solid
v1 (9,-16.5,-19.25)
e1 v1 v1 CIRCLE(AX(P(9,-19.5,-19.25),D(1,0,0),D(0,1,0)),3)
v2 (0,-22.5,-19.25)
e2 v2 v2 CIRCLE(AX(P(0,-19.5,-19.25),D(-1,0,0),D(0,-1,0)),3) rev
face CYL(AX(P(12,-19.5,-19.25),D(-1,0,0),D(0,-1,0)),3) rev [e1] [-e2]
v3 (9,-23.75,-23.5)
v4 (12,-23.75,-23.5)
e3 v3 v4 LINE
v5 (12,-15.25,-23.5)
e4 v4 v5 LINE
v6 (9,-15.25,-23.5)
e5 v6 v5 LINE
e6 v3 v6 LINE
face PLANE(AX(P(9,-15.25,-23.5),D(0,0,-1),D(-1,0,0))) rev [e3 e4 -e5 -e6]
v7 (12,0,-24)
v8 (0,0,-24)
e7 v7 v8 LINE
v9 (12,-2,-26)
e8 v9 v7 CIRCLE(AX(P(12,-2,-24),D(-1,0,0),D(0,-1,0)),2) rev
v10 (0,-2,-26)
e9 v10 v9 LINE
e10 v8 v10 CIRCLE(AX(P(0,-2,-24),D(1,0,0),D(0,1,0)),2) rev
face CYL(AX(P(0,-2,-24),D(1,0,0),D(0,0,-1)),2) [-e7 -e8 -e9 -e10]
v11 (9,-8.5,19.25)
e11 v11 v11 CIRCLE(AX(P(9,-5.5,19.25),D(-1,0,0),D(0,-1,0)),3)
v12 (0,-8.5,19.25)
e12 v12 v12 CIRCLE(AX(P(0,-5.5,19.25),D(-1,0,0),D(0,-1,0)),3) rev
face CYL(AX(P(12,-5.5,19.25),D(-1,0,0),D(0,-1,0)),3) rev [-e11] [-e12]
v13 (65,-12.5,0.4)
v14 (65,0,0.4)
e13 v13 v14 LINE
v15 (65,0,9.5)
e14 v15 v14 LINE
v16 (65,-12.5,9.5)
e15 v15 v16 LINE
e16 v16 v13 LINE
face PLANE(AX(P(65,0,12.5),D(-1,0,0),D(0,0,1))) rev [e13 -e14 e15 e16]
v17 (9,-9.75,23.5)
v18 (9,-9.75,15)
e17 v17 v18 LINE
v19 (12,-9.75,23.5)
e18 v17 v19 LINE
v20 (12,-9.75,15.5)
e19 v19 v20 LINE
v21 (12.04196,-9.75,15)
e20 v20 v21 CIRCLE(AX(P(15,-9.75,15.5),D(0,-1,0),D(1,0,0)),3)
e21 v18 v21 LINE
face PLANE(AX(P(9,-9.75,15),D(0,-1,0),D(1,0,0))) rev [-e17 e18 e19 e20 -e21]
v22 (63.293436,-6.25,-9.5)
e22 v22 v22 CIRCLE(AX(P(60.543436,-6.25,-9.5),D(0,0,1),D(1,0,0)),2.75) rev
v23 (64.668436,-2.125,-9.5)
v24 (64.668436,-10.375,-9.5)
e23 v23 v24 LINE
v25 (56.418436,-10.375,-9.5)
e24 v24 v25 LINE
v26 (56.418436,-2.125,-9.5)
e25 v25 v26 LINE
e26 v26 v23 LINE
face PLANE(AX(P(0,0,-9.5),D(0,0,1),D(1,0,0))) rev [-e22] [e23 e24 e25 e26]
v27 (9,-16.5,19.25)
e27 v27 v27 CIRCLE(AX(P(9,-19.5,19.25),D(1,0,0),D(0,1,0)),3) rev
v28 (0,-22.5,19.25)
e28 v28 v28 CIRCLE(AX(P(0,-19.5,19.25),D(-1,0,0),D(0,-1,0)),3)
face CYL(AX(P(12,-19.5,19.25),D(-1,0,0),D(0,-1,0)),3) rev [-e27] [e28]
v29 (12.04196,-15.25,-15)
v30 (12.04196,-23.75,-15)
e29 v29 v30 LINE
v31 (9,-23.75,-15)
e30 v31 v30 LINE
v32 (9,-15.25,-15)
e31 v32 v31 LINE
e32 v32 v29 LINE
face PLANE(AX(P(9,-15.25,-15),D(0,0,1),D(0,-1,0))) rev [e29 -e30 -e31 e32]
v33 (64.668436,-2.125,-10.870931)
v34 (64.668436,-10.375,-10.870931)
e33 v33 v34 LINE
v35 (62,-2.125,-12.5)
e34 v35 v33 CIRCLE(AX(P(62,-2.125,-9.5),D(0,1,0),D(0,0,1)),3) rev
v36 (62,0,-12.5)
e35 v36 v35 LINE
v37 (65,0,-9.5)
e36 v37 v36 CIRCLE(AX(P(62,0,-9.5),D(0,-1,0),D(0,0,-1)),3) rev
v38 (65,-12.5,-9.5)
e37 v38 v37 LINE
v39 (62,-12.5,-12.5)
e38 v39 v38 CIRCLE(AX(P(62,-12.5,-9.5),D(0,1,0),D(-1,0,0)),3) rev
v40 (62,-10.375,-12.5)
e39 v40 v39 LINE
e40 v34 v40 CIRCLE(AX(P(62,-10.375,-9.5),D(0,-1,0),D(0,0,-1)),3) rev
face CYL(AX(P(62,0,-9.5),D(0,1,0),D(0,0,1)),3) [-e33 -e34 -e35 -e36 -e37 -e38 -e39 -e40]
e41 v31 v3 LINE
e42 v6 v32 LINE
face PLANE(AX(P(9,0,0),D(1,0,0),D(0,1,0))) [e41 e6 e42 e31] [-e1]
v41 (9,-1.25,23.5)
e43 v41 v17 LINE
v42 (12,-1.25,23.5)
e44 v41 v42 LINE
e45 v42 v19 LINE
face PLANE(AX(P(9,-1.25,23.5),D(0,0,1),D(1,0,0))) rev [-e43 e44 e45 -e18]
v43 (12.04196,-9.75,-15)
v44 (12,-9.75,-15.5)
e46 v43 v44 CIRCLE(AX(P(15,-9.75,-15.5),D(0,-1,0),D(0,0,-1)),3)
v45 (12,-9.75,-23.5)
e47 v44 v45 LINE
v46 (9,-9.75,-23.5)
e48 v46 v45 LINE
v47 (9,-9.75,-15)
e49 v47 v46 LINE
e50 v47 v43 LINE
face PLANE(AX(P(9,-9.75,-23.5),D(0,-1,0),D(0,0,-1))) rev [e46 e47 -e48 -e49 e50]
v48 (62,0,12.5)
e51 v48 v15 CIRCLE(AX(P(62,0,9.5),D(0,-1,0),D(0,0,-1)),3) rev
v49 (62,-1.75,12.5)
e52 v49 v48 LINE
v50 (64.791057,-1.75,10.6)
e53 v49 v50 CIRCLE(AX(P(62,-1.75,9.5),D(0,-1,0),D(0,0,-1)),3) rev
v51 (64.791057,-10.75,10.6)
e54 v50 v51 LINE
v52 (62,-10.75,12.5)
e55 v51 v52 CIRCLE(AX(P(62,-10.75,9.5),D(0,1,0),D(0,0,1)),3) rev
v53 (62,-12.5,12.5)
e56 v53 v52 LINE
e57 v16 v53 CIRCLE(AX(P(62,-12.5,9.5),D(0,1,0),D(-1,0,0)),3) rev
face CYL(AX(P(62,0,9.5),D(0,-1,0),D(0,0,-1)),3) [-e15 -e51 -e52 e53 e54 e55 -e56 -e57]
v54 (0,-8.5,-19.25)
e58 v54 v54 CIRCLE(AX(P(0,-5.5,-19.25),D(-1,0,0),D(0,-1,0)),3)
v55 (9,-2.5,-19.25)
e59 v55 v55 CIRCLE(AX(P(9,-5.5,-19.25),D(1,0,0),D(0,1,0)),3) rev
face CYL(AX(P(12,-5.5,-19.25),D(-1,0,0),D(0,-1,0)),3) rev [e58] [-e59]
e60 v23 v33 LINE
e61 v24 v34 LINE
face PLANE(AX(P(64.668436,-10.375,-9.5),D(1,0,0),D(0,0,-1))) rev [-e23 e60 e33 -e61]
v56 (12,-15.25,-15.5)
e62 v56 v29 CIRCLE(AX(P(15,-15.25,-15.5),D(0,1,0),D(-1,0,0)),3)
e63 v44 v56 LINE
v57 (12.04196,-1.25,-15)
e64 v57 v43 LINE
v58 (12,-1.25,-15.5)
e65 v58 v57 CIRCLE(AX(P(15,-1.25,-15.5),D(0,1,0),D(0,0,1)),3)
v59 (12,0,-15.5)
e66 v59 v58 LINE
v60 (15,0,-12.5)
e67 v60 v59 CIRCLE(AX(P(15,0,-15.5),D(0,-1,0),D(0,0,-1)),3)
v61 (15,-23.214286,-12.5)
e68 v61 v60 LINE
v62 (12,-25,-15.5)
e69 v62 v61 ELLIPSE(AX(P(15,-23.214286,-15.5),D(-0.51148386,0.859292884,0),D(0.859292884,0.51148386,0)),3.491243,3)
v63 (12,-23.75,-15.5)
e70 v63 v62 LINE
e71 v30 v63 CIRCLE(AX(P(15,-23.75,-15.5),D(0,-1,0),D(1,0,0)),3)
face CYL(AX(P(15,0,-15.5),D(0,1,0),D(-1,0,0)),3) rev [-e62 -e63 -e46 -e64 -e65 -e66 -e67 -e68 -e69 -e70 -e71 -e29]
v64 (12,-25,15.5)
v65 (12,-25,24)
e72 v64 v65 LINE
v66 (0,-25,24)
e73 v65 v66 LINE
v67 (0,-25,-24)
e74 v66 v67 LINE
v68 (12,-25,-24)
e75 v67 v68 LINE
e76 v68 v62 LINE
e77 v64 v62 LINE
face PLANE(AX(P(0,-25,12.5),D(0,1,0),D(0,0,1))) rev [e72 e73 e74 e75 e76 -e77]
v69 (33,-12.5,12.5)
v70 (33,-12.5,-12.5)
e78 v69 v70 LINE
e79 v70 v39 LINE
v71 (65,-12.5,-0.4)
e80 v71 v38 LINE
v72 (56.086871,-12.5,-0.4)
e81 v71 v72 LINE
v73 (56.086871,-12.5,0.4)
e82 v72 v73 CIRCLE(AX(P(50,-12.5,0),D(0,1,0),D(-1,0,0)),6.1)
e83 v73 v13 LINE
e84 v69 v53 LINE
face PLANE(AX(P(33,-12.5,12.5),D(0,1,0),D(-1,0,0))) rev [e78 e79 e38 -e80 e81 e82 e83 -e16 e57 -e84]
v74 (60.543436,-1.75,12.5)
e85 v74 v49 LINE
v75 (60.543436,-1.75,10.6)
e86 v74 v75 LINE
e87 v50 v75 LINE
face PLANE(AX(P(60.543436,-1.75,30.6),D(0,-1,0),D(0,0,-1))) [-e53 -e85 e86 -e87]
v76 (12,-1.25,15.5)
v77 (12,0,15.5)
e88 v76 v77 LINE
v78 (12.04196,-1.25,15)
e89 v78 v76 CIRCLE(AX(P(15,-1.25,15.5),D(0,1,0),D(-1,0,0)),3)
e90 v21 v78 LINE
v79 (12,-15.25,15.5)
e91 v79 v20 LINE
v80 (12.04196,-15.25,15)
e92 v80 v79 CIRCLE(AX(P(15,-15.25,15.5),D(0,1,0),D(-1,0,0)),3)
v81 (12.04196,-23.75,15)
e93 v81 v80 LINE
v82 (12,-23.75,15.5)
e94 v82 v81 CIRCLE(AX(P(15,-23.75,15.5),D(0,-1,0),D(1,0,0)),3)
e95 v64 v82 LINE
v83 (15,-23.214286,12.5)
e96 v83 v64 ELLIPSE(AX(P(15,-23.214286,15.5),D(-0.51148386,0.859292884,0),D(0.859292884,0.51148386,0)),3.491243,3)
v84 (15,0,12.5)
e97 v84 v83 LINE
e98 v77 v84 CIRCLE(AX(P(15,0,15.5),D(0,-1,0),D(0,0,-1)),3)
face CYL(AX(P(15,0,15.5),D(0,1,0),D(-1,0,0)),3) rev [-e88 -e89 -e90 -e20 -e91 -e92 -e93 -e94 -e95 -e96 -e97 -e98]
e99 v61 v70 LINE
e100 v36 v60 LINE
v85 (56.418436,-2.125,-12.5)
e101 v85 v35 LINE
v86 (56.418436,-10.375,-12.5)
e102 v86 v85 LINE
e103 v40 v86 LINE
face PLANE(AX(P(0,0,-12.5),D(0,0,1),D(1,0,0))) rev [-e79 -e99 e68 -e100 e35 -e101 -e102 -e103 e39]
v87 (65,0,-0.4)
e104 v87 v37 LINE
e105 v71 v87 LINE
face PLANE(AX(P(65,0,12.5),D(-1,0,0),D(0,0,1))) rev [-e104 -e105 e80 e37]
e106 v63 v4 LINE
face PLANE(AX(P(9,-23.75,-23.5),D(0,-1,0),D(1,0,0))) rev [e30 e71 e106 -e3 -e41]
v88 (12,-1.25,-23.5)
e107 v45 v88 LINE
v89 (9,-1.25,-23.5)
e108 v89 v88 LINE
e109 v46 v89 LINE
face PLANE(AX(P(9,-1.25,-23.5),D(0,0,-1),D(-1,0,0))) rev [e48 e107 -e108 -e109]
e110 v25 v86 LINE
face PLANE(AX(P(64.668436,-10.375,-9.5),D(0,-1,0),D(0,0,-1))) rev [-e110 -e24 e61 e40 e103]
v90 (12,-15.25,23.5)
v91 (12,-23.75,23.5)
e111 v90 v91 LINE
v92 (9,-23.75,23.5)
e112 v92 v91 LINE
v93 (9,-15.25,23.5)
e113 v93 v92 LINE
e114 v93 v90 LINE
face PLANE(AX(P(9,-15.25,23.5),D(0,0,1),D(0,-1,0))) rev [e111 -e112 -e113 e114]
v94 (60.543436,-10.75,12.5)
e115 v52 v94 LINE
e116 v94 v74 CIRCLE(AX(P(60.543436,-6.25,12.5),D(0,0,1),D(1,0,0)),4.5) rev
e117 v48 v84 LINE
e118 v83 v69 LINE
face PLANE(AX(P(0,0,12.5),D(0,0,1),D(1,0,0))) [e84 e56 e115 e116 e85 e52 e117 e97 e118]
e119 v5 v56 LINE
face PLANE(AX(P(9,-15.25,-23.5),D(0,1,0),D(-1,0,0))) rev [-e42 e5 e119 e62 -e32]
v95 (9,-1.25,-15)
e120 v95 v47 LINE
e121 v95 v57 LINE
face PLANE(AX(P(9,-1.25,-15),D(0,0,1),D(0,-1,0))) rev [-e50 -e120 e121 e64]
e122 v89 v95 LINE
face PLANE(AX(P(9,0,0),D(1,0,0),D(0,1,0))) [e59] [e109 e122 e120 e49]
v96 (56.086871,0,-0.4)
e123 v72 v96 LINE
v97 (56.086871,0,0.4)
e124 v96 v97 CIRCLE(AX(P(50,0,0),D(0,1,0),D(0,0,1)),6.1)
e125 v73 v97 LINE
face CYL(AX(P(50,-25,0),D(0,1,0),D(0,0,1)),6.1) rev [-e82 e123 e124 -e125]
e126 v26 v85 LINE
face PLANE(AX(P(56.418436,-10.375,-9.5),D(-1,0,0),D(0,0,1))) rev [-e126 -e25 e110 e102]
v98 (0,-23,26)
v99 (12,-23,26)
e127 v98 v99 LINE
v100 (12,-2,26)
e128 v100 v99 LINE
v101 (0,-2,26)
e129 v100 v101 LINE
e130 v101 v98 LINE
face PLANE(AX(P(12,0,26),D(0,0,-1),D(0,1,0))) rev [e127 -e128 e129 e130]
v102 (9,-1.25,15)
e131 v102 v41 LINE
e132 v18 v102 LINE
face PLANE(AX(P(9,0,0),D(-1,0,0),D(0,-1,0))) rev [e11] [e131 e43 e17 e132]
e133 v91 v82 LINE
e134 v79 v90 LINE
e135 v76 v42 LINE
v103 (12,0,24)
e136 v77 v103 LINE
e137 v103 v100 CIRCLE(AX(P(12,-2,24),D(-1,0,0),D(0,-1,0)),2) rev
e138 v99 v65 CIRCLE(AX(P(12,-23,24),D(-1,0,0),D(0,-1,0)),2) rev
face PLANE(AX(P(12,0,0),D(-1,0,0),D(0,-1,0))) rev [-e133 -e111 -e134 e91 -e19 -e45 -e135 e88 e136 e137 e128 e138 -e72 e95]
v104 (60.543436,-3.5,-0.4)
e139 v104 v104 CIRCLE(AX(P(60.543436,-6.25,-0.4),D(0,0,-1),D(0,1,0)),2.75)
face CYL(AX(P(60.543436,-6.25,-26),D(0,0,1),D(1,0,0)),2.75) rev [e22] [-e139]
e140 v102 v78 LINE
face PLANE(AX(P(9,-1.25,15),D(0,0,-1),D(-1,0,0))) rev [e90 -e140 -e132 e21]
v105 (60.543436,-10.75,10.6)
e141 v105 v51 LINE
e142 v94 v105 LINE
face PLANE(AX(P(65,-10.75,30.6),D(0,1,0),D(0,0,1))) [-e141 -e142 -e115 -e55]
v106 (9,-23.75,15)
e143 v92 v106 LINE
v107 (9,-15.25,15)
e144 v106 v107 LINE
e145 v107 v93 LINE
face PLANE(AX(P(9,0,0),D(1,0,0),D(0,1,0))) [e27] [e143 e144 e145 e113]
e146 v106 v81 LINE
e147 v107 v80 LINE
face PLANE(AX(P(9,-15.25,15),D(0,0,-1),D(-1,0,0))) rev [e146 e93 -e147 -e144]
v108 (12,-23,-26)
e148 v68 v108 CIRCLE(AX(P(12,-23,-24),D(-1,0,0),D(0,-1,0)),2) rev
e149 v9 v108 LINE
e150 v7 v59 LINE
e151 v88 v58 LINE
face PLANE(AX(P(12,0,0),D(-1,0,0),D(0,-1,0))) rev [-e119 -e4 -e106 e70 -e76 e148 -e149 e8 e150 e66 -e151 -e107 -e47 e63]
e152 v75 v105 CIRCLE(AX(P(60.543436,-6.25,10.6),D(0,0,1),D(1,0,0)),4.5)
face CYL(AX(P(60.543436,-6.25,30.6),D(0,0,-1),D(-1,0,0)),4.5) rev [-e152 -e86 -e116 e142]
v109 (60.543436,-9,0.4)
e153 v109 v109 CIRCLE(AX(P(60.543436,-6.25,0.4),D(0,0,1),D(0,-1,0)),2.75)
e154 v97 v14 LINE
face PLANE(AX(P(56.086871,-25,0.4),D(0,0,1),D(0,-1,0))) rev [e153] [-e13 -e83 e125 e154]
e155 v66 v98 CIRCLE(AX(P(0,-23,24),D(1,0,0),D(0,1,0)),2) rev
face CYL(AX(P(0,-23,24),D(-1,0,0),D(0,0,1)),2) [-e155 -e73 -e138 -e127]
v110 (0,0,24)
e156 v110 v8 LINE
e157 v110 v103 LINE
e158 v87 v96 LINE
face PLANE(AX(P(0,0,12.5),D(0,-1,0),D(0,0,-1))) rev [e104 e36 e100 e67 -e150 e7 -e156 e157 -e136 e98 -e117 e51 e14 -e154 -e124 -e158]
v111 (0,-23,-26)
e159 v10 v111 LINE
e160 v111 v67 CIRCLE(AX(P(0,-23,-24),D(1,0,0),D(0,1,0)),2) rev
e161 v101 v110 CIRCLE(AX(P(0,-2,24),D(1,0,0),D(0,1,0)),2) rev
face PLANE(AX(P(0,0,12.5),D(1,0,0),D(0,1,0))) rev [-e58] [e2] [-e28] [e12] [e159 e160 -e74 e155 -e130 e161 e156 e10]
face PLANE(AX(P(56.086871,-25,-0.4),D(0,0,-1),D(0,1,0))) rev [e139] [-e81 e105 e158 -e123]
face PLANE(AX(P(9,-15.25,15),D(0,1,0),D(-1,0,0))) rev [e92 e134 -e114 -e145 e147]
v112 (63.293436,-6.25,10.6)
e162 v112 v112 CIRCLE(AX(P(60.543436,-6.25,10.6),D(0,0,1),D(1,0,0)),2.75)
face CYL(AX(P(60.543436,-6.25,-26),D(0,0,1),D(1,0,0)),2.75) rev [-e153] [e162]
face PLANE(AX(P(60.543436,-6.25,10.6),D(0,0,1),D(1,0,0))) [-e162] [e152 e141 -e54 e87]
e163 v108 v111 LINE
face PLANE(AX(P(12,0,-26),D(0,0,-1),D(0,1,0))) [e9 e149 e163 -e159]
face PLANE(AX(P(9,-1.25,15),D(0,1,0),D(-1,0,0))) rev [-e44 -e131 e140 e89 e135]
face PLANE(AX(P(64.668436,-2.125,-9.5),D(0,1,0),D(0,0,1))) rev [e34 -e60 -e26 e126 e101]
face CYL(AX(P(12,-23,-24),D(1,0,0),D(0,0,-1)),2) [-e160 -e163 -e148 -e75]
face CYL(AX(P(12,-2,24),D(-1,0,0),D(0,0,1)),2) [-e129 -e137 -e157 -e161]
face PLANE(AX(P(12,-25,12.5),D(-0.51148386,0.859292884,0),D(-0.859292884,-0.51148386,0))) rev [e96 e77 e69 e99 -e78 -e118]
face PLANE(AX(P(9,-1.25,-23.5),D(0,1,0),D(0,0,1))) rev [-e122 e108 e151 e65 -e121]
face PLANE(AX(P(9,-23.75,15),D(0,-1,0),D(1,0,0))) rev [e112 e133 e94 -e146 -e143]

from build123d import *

# Parameters (mm, degrees)
BOSS_EXTRUDE1_DEPTH     = 12.5
SKETCH2_W               = 52
SKETCH2_H               = 25
SKETCH2_R               = 3
BOSS_EXTRUDE2_DEPTH     = 12
CUT_EXTRUDE2_DEPTH      = 75.33707016
FILLET1_R               = 2
FILLET2_R               = 3
CUT_EXTRUDE3_DEPTH      = 75.47791619
CUT_EXTRUDE3_DEPTH_BACK = 75.47791619
SKETCH7_R               = 2.75
CUT_EXTRUDE4_START      = 11
SKETCH7_3_R             = 2.75
CUT_EXTRUDE4_DEPTH      = 20
SKETCH9_W               = 8.25
SKETCH9_H               = 8.25
CUT_EXTRUDE5_DEPTH      = 3
SKETCH12_W              = 8.5
SKETCH12_H              = 8.5
CUT_EXTRUDE7_DEPTH      = 3
FILLET3_R               = 3


with BuildPart() as part:
    # Sketch1 → Boss-Extrude1 (new, symmetric)
    with BuildSketch(Plane.XY):
        Polygon((12, -25), (33, -12.5), (65, -12.5), (65, 0), (0, 0), (0, -25), align=None)
    extrude(amount=BOSS_EXTRUDE1_DEPTH, both=True)

    # Sketch2 → Boss-Extrude2 (add)
    with BuildSketch(Plane.ZY):
        with Locations((0, -12.5)):
            Rectangle(SKETCH2_W, SKETCH2_H)
        with Locations(Location((-19.25, -5.5, 0), (0, 0, 270))):
            Circle(SKETCH2_R, mode=Mode.SUBTRACT)
        with Locations(Location((-19.25, -19.5, 0), (0, 0, 270))):
            Circle(SKETCH2_R, mode=Mode.SUBTRACT)
        with Locations(Location((19.25, -19.5, 0), (0, 0, 270))):
            Circle(SKETCH2_R, mode=Mode.SUBTRACT)
        with Locations(Location((19.25, -5.5, 0), (0, 0, 270))):
            Circle(SKETCH2_R, mode=Mode.SUBTRACT)
    extrude(amount=-BOSS_EXTRUDE2_DEPTH)

    # Sketch4 → Cut-Extrude2 (cut, through all)
    with BuildSketch(Plane(origin=(0, 0, 0), x_dir=(1, 0, 0), z_dir=(0, 1, 0))):
        with BuildLine():
            Line((56.086871117, -0.4), (65, -0.4))
            Line((65, -0.4), (65, 0.4))
            Line((65, 0.4), (56.086871117, 0.4))
            ThreePointArc((56.086871117, 0.4), (43.9, 0), (56.086871117, -0.4))
        make_face()
    extrude(amount=-CUT_EXTRUDE2_DEPTH, mode=Mode.SUBTRACT)

    # Fillet1
    fillet1_edges = [part.edges().sort_by_distance(p)[0] for p in [
        (6, -25, -26),
        (6, 0, -26),
        (6, 0, 26),
        (6, -25, 26),
    ]]
    fillet(fillet1_edges, radius=FILLET1_R)

    # Fillet2
    fillet2_edges = [part.edges().sort_by_distance(p)[0] for p in [
        (65, -6.25, 12.5),
        (65, -6.25, -12.5),
    ]]
    fillet(fillet2_edges, radius=FILLET2_R)

    # Sketch7 → Cut-Extrude3 (cut, two sides: drawn at the far end of the back side and taken through both)
    with BuildSketch(Plane.XY.offset(-0.4).offset(-CUT_EXTRUDE3_DEPTH_BACK)):
        with Locations(Location((60.543435559, -6.25, 0), (0, 0, 58.017528447))):
            Circle(SKETCH7_R)
    extrude(amount=CUT_EXTRUDE3_DEPTH + CUT_EXTRUDE3_DEPTH_BACK, mode=Mode.SUBTRACT)

    # Sketch7<3> → Cut-Extrude4 (cut)
    with BuildSketch(Plane.XY.offset(-0.4).offset(CUT_EXTRUDE4_START)):
        with Locations((60.543435559, -6.25)):
            Circle(SKETCH7_3_R)
        with BuildLine():
            Line((60.543435559, -1.75), (65, -1.75))
            Line((65, -1.75), (65, -10.75))
            Line((65, -10.75), (60.543435559, -10.75))
            ThreePointArc((60.543435559, -10.75), (56.043435559, -6.25), (60.543435559, -1.75))
        make_face()
    extrude(amount=CUT_EXTRUDE4_DEPTH, mode=Mode.SUBTRACT)

    # Sketch9 → Cut-Extrude5 (cut)
    with BuildSketch(Plane(origin=(0, 0, -12.5), x_dir=(-1, 0, 0), z_dir=(0, 0, -1))):
        with Locations((-60.543435559, -6.25)):
            Rectangle(SKETCH9_W, SKETCH9_H)
    extrude(amount=-CUT_EXTRUDE5_DEPTH, mode=Mode.SUBTRACT)

    # Sketch12 → Cut-Extrude7 (cut)
    with BuildSketch(Plane(origin=(12, 0, 0), x_dir=(0, 0, -1), z_dir=(1, 0, 0))):
        with Locations((19.25, -5.5)):
            Rectangle(SKETCH12_W, SKETCH12_H)
        with Locations((-19.25, -5.5)):
            Rectangle(SKETCH12_W, SKETCH12_H)
        with Locations((19.25, -19.5)):
            Rectangle(SKETCH12_W, SKETCH12_H)
        with Locations((-19.25, -19.5)):
            Rectangle(SKETCH12_W, SKETCH12_H)
    extrude(amount=-CUT_EXTRUDE7_DEPTH, mode=Mode.SUBTRACT)

    # Fillet3
    # the kernel refuses this fillet: 3 mm, written as the material it adds along each edge
    with BuildSketch(Plane(origin=(12, -32.5, -12.5), x_dir=(1, 0, 0), z_dir=(0, 1, 0))) as fillet3_piece_1_section:
        with BuildLine():
            CenterArc((FILLET3_R, FILLET3_R), FILLET3_R, 180, 90)
            Line((0, FILLET3_R), (0, 0))
            Line((0, 0), (FILLET3_R, 0))
        make_face()
    fillet3_piece_1 = extrude(amount=32.5, mode=Mode.PRIVATE)
    fillet3_piece_1 = split(fillet3_piece_1, bisect_by=Plane(origin=(12.672630608, -24.599624638, -13.288072161), z_dir=(-0.5114838597676827, 0.8592928844097069, 0)), keep=Keep.TOP, mode=Mode.PRIVATE)
    fillet3_piece_1 = split(fillet3_piece_1, bisect_by=Plane(origin=(12.457820622, -24.238743862, -15), z_dir=(0, 0, 1)), keep=Keep.TOP, mode=Mode.PRIVATE)
    add(fillet3_piece_1)
    with BuildSketch(Plane(origin=(12, -32.5, -12.5), x_dir=(1, 0, 0), z_dir=(0, 1, 0))) as fillet3_piece_2_section:
        with BuildLine():
            CenterArc((FILLET3_R, FILLET3_R), FILLET3_R, 180, 90)
            Line((0, FILLET3_R), (0, 0))
            Line((0, 0), (FILLET3_R, 0))
        make_face()
    fillet3_piece_2 = extrude(amount=40, mode=Mode.PRIVATE)
    fillet3_piece_2 = split(fillet3_piece_2, bisect_by=Plane(origin=(12.285585988, -24.830008341, -15.125075667), z_dir=(-0.5114838597676827, 0.8592928844097069, 0)), keep=Keep.TOP, mode=Mode.PRIVATE)
    fillet3_piece_2 = split(fillet3_piece_2, bisect_by=Plane(origin=(12.012528257, -23.75, -15.125075667), z_dir=(0, -1, 0)), keep=Keep.TOP, mode=Mode.PRIVATE)
    add(fillet3_piece_2)
    with BuildSketch(Plane(origin=(12, -32.5, -12.5), x_dir=(1, 0, 0), z_dir=(0, 1, 0))) as fillet3_piece_3_section:
        with BuildLine():
            CenterArc((FILLET3_R, FILLET3_R), FILLET3_R, 180, 90)
            Line((0, FILLET3_R), (0, 0))
            Line((0, 0), (FILLET3_R, 0))
        make_face()
    fillet3_piece_3 = extrude(amount=40, mode=Mode.PRIVATE)
    fillet3_piece_3 = split(fillet3_piece_3, bisect_by=Plane(origin=(12.012572796, -15.25, -15.124824501), z_dir=(0, 1, 0)), keep=Keep.TOP, mode=Mode.PRIVATE)
    fillet3_piece_3 = split(fillet3_piece_3, bisect_by=Plane(origin=(12.012572796, -9.75, -15.124824501), z_dir=(0, -1, 0)), keep=Keep.TOP, mode=Mode.PRIVATE)
    add(fillet3_piece_3)
    with BuildSketch(Plane(origin=(12, -32.5, -12.5), x_dir=(1, 0, 0), z_dir=(0, 1, 0))) as fillet3_piece_4_section:
        with BuildLine():
            CenterArc((FILLET3_R, FILLET3_R), FILLET3_R, 180, 90)
            Line((0, FILLET3_R), (0, 0))
            Line((0, 0), (FILLET3_R, 0))
        make_face()
    fillet3_piece_4 = extrude(amount=32.5, mode=Mode.PRIVATE)
    fillet3_piece_4 = split(fillet3_piece_4, bisect_by=Plane(origin=(12.012572796, -1.25, -15.124824501), z_dir=(0, 1, 0)), keep=Keep.TOP, mode=Mode.PRIVATE)
    add(fillet3_piece_4)
    with BuildSketch(Plane(origin=(12, -32.5, 12.5), x_dir=(1, 0, 0), z_dir=(0, 1, 0))) as fillet3_piece_5_section:
        with BuildLine():
            CenterArc((FILLET3_R, -FILLET3_R), FILLET3_R, 90, 90)
            Line((0, -FILLET3_R), (0, 0))
            Line((0, 0), (FILLET3_R, 0))
        make_face()
    fillet3_piece_5 = extrude(amount=32.5, mode=Mode.PRIVATE)
    fillet3_piece_5 = split(fillet3_piece_5, bisect_by=Plane(origin=(12.672630608, -24.599624638, 13.288072161), z_dir=(-0.5114838597676827, 0.8592928844097069, 0)), keep=Keep.TOP, mode=Mode.PRIVATE)
    fillet3_piece_5 = split(fillet3_piece_5, bisect_by=Plane(origin=(12.457820622, -24.238743862, 15), z_dir=(0, 0, -1)), keep=Keep.TOP, mode=Mode.PRIVATE)
    add(fillet3_piece_5)
    with BuildSketch(Plane(origin=(12, -32.5, 12.5), x_dir=(1, 0, 0), z_dir=(0, 1, 0))) as fillet3_piece_6_section:
        with BuildLine():
            CenterArc((FILLET3_R, -FILLET3_R), FILLET3_R, 90, 90)
            Line((0, -FILLET3_R), (0, 0))
            Line((0, 0), (FILLET3_R, 0))
        make_face()
    fillet3_piece_6 = extrude(amount=40, mode=Mode.PRIVATE)
    fillet3_piece_6 = split(fillet3_piece_6, bisect_by=Plane(origin=(12.285585988, -24.830008341, 15.125075667), z_dir=(-0.5114838597676827, 0.8592928844097069, 0)), keep=Keep.TOP, mode=Mode.PRIVATE)
    fillet3_piece_6 = split(fillet3_piece_6, bisect_by=Plane(origin=(12.012528257, -23.75, 15.125075667), z_dir=(0, -1, 0)), keep=Keep.TOP, mode=Mode.PRIVATE)
    add(fillet3_piece_6)
    with BuildSketch(Plane(origin=(12, -32.5, 12.5), x_dir=(1, 0, 0), z_dir=(0, 1, 0))) as fillet3_piece_7_section:
        with BuildLine():
            CenterArc((FILLET3_R, -FILLET3_R), FILLET3_R, 90, 90)
            Line((0, -FILLET3_R), (0, 0))
            Line((0, 0), (FILLET3_R, 0))
        make_face()
    fillet3_piece_7 = extrude(amount=40, mode=Mode.PRIVATE)
    fillet3_piece_7 = split(fillet3_piece_7, bisect_by=Plane(origin=(12.012572796, -15.25, 15.124824501), z_dir=(0, 1, 0)), keep=Keep.TOP, mode=Mode.PRIVATE)
    fillet3_piece_7 = split(fillet3_piece_7, bisect_by=Plane(origin=(12.012572796, -9.75, 15.124824501), z_dir=(0, -1, 0)), keep=Keep.TOP, mode=Mode.PRIVATE)
    add(fillet3_piece_7)
    with BuildSketch(Plane(origin=(12, -32.5, 12.5), x_dir=(1, 0, 0), z_dir=(0, 1, 0))) as fillet3_piece_8_section:
        with BuildLine():
            CenterArc((FILLET3_R, -FILLET3_R), FILLET3_R, 90, 90)
            Line((0, -FILLET3_R), (0, 0))
            Line((0, 0), (FILLET3_R, 0))
        make_face()
    fillet3_piece_8 = extrude(amount=32.5, mode=Mode.PRIVATE)
    fillet3_piece_8 = split(fillet3_piece_8, bisect_by=Plane(origin=(12.012572796, -1.25, 15.124824501), z_dir=(0, 1, 0)), keep=Keep.TOP, mode=Mode.PRIVATE)
    add(fillet3_piece_8)


solid = part.part
